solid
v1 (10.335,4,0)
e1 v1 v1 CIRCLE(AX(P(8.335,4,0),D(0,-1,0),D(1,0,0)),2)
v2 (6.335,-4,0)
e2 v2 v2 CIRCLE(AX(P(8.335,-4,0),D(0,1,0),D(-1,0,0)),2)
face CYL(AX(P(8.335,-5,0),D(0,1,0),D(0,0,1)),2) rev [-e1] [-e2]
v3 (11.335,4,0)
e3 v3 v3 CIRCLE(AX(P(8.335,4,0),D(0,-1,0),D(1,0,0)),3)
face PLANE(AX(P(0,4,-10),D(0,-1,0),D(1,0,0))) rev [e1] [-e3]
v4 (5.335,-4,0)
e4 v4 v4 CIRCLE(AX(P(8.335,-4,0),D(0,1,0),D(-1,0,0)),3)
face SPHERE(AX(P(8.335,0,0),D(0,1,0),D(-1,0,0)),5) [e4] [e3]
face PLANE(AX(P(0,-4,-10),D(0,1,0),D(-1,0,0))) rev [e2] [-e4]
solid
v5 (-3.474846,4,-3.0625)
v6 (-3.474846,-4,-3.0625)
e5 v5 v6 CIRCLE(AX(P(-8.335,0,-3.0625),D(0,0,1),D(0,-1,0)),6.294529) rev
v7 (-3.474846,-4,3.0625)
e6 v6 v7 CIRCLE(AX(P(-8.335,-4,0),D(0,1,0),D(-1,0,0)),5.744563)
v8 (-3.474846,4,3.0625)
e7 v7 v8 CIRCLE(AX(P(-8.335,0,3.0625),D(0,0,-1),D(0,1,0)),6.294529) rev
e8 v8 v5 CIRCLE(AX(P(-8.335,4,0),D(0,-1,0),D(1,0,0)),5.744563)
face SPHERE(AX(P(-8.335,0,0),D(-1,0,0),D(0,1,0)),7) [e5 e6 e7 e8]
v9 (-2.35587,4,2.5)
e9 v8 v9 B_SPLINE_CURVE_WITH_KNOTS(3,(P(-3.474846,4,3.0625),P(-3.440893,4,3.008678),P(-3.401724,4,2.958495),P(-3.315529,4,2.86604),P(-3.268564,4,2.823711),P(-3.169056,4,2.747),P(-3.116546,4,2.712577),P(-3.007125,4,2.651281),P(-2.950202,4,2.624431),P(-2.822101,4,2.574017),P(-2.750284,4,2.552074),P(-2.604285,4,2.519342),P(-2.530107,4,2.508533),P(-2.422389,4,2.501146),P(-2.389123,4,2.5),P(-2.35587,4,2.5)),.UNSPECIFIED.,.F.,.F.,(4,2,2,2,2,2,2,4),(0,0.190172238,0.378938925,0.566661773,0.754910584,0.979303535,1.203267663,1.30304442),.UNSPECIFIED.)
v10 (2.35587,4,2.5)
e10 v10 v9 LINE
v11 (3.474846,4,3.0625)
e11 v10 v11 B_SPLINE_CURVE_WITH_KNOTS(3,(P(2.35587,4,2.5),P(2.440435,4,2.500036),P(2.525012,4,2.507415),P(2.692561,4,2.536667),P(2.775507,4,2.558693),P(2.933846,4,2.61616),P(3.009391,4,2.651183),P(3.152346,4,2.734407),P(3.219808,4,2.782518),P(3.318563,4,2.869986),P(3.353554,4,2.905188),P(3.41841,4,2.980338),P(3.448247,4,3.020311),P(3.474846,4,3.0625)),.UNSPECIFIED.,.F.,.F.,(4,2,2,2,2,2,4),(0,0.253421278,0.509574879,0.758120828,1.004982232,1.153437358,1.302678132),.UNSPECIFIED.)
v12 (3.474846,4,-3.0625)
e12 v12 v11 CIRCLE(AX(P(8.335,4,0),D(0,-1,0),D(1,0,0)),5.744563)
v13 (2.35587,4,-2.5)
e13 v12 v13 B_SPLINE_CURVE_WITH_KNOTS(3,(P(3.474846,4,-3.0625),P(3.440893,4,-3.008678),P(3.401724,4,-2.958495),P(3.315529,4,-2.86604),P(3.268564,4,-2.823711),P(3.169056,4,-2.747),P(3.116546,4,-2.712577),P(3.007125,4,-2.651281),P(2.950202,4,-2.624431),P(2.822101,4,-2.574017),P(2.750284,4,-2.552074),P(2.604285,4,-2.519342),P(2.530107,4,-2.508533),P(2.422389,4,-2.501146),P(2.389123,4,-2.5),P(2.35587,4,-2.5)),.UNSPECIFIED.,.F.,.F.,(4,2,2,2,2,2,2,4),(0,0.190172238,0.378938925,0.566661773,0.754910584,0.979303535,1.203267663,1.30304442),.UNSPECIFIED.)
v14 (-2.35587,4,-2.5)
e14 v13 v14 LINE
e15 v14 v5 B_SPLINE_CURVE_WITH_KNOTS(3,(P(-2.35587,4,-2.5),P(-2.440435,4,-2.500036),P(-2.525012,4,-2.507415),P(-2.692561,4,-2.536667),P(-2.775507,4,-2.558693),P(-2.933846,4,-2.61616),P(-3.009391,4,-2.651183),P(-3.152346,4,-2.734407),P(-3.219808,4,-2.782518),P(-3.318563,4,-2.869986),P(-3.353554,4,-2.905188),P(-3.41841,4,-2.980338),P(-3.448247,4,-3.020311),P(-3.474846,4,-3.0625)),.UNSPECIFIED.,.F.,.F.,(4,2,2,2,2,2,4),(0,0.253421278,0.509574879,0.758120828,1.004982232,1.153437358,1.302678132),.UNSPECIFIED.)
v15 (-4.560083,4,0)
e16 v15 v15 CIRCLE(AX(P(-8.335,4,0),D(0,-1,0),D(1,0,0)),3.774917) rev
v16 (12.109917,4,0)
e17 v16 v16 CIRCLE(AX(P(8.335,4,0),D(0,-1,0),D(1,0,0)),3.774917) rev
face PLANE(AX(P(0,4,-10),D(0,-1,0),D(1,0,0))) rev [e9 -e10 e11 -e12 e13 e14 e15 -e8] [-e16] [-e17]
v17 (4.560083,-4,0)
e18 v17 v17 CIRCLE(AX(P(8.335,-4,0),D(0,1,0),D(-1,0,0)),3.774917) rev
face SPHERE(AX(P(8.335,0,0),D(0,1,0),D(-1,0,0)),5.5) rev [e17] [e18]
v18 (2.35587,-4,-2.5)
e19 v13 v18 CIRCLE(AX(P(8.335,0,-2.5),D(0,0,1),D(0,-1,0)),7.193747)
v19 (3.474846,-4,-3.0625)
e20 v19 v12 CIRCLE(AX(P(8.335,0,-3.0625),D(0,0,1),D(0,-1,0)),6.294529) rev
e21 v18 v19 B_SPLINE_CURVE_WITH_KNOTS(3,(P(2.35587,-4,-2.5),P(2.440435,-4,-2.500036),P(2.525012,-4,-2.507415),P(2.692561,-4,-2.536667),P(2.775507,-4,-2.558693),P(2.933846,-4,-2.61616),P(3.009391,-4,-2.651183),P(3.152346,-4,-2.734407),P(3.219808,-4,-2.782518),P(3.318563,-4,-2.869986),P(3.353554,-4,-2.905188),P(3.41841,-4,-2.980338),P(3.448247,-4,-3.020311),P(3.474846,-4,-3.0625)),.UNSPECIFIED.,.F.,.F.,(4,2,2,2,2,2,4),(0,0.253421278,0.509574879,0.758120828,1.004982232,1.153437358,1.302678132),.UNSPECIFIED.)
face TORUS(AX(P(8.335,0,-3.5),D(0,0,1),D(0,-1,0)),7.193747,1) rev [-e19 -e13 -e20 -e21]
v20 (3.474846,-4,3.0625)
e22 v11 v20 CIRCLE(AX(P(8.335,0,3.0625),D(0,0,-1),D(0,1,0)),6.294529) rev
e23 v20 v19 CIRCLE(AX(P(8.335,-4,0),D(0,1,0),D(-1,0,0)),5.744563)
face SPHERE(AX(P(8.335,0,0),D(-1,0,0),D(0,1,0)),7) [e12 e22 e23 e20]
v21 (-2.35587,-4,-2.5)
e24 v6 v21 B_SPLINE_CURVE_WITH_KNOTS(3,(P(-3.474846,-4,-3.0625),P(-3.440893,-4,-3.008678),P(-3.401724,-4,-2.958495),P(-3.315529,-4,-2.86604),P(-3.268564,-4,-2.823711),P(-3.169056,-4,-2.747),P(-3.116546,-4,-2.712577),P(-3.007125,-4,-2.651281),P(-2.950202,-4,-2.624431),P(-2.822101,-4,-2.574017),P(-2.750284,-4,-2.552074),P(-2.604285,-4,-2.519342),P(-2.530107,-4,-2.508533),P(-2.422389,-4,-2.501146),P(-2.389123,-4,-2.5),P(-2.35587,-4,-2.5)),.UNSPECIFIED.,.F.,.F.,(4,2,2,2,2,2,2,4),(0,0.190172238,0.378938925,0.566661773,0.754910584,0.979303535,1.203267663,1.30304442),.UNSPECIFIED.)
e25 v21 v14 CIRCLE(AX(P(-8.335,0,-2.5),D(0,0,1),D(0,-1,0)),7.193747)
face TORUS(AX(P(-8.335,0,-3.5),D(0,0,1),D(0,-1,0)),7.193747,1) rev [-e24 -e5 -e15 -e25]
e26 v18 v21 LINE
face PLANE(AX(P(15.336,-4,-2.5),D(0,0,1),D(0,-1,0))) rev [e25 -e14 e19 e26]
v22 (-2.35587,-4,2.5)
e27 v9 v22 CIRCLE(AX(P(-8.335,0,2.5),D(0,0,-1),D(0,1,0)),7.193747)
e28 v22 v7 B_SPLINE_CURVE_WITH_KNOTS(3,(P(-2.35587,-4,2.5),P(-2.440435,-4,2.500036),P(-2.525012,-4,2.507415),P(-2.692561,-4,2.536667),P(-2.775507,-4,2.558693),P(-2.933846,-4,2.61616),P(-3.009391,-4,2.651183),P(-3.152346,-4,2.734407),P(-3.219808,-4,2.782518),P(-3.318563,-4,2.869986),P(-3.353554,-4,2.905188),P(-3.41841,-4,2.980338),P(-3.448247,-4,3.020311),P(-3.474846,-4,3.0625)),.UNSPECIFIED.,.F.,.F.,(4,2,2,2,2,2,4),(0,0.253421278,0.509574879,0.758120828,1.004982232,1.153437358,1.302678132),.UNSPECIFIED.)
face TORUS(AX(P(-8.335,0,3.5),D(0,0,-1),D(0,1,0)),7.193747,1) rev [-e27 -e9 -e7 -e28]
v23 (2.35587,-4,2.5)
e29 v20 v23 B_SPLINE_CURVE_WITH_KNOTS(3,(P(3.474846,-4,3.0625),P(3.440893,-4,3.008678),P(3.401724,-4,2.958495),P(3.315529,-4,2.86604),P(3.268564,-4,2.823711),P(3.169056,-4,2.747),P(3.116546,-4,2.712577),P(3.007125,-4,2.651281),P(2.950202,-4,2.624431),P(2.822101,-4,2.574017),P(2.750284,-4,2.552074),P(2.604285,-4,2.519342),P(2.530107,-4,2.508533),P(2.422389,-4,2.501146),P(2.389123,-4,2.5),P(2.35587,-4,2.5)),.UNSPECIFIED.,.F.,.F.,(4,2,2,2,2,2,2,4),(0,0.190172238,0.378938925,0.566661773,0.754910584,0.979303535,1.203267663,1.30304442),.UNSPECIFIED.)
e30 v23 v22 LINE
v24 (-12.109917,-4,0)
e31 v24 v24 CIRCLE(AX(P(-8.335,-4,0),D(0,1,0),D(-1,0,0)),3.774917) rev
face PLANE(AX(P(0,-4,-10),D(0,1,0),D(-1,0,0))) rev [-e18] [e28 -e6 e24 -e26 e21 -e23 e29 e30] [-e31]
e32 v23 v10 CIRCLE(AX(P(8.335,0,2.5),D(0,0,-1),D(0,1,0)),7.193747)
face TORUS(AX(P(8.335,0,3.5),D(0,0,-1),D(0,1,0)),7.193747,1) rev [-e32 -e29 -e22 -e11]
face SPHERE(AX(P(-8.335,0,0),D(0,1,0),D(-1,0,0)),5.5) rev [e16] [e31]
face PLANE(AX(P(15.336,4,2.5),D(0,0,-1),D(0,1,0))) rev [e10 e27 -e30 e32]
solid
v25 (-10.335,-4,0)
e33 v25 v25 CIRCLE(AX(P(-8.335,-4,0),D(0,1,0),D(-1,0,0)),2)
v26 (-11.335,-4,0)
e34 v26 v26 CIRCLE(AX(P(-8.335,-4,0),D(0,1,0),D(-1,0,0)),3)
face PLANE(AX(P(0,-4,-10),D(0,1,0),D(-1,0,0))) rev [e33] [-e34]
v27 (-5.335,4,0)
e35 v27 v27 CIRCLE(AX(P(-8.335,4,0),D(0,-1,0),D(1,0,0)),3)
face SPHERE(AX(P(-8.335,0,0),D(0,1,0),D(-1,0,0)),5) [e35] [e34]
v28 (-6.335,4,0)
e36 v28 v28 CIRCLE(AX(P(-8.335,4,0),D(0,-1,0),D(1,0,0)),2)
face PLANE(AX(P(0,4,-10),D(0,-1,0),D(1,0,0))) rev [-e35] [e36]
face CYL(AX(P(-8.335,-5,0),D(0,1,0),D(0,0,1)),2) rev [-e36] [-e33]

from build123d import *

# Parameters (mm, degrees)
CORTAR_EXTRUIR1_DEPTH                    = 10
SALIENTE_EXTRUIR1_REACH                  = 19.325
SALIENTE_EXTRUIR1_END_RADIUS             = 7
CROQUIS3_W                               = 5
CROQUIS3_H                               = 8
SALIENTE_EXTRUIR1_DIRECTION_2_REACH      = 19.325
SALIENTE_EXTRUIR1_DIRECTION_2_END_RADIUS = 7
CROQUIS4_R                               = 2
CORTAR_EXTRUIR3_DEPTH                    = 5
REDONDEO1_R                              = 1


with BuildPart() as part:
    # Croquis1 → Revolución1 (revolve)
    with BuildSketch(Plane.XY):
        with BuildLine():
            Line((-13.335, 0), (-3.335, 0))
            ThreePointArc((-3.335, 0), (-8.335, 5), (-13.335, 0))
        make_face()
        with BuildLine():
            Line((-13.835, 0), (-15.335, 0))
            ThreePointArc((-15.335, 0), (-8.335, 7), (-1.335, 0))
            Line((-1.335, 0), (-2.835, 0))
            ThreePointArc((-2.835, 0), (-8.335, 5.5), (-13.835, 0))
        make_face()
        with BuildLine():
            Line((2.835, 0), (1.335, 0))
            ThreePointArc((1.335, 0), (8.335, 7), (15.335, 0))
            Line((15.335, 0), (13.835, 0))
            ThreePointArc((13.835, 0), (8.335, 5.5), (2.835, 0))
        make_face()
        with BuildLine():
            Line((13.335, 0), (3.335, 0))
            ThreePointArc((3.335, 0), (8.335, 5), (13.335, 0))
        make_face()
    revolve(axis=Axis((-8.335, 0, 0), (1, 0, 0)))

    # Croquis2 → Cortar-Extruir1 (cut, symmetric)
    with BuildSketch(Plane.XY):
        Polygon((0, 4), (-15, 4), (-15, 9), (15, 9), (15, 4), align=None)
        Polygon((15, -9), (15, -4), (0, -4), (-15, -4), (-15, -9), align=None)
    extrude(amount=CORTAR_EXTRUIR1_DEPTH, both=True, mode=Mode.SUBTRACT)

    # Saliente-Extruir1: up to this sphere (the profile starts outside it)
    saliente_extruir1_end = Location((8.335, 0, 0)) * Sphere(SALIENTE_EXTRUIR1_END_RADIUS, mode=Mode.PRIVATE)
    # Croquis3 → Saliente-Extruir1 (add, up to the surface)
    with BuildSketch(Plane(origin=(0, 0, 0), x_dir=(0, 0, -1), z_dir=(1, 0, 0)), mode=Mode.PRIVATE) as saliente_extruir1_sk1:
        Rectangle(CROQUIS3_W, CROQUIS3_H)
    saliente_extruir1_tool1 = extrude(saliente_extruir1_sk1.sketch, amount=SALIENTE_EXTRUIR1_REACH, mode=Mode.PRIVATE) - saliente_extruir1_end
    add(saliente_extruir1_tool1.solids().sort_by_distance((0, 0, 0))[0])

    # Saliente-Extruir1 direction 2: up to this sphere (the profile starts outside it)
    saliente_extruir1_direction_2_end = Location((-8.335, 0, 0)) * Sphere(SALIENTE_EXTRUIR1_DIRECTION_2_END_RADIUS, mode=Mode.PRIVATE)
    # Croquis3 → Saliente-Extruir1 direction 2 (add, up to the surface)
    with BuildSketch(Plane(origin=(0, 0, 0), x_dir=(0, 0, -1), z_dir=(1, 0, 0)), mode=Mode.PRIVATE) as saliente_extruir1_direction_2_sk1:
        Rectangle(CROQUIS3_W, CROQUIS3_H)
    saliente_extruir1_direction_2_tool1 = extrude(saliente_extruir1_direction_2_sk1.sketch, amount=-SALIENTE_EXTRUIR1_DIRECTION_2_REACH, mode=Mode.PRIVATE) - saliente_extruir1_direction_2_end
    add(saliente_extruir1_direction_2_tool1.solids().sort_by_distance((0, 0, 0))[0])

    # Croquis4 → Cortar-Extruir3 (cut, symmetric)
    with BuildSketch(Plane(origin=(0, 0, 0), x_dir=(1, 0, 0), z_dir=(0, 1, 0))):
        with Locations(Location((-8.335, 0, 0), (0, 0, 180))):
            Circle(CROQUIS4_R)
        with Locations(Location((8.335, 0, 0), (0, 0, 180))):
            Circle(CROQUIS4_R)
    extrude(amount=CORTAR_EXTRUIR3_DEPTH, both=True, mode=Mode.SUBTRACT)

    # Redondeo1
    # the kernel refuses this fillet: 1 mm, written as the material it adds along each edge
    with BuildSketch(Plane(origin=(-8.335, 0, 2.5), x_dir=(0.6145573039832218, 0.7888721823723244, 0), z_dir=(-0.7888721823723244, 0.6145573039832218, 0))) as redondeo1_piece_1_section:
        with BuildLine():
            CenterArc((7.193747285, -1), REDONDEO1_R, 90, 64.055520228)
            ThreePointArc((6.294528874, -0.5625), (6.422599664, -0.283920537), (6.538348415, 0))
            Line((6.538348415, 0), (7.193747285, 0))
        make_face()
    redondeo1_piece_1 = revolve(axis=Axis((-8.335, 0, 2.5), (0, 0, -1)), revolution_arc=104.160479503, mode=Mode.PRIVATE)
    redondeo1_piece_1 = split(redondeo1_piece_1, bisect_by=Plane(origin=(-1.676585833, -4, 2.644210853), z_dir=(0, 1, 0)), keep=Keep.TOP, mode=Mode.PRIVATE)
    redondeo1_piece_1 = split(redondeo1_piece_1, bisect_by=Plane(origin=(-1.676585833, 4, 2.644210853), z_dir=(0, -1, 0)), keep=Keep.TOP, mode=Mode.PRIVATE)
    add(redondeo1_piece_1)
    with BuildSketch(Plane(origin=(-8.335, 0, -2.5), x_dir=(0.6145573039832218, 0.7888721823723244, 0), z_dir=(-0.7888721823723244, 0.6145573039832218, 0))) as redondeo1_piece_2_section:
        with BuildLine():
            CenterArc((7.193747285, 1), REDONDEO1_R, 205.944479772, 64.055520228)
            ThreePointArc((6.294528874, 0.5625), (6.422599664, 0.283920537), (6.538348415, 0))
            Line((6.538348415, 0), (7.193747285, 0))
        make_face()
    redondeo1_piece_2 = revolve(axis=Axis((-8.335, 0, -2.5), (0, 0, -1)), revolution_arc=104.160479503, mode=Mode.PRIVATE)
    redondeo1_piece_2 = split(redondeo1_piece_2, bisect_by=Plane(origin=(-1.676585833, 4, -2.644210853), z_dir=(0, -1, 0)), keep=Keep.TOP, mode=Mode.PRIVATE)
    redondeo1_piece_2 = split(redondeo1_piece_2, bisect_by=Plane(origin=(-1.676585833, -4, -2.644210853), z_dir=(0, 1, 0)), keep=Keep.TOP, mode=Mode.PRIVATE)
    add(redondeo1_piece_2)
    with BuildSketch(Plane(origin=(8.335, 0, 2.5), x_dir=(-0.6145573039832218, 0.7888721823723245, 0), z_dir=(0.7888721823723245, 0.6145573039832218, 0))) as redondeo1_piece_3_section:
        with BuildLine():
            CenterArc((7.193747285, 1), REDONDEO1_R, 205.944479772, 64.055520228)
            ThreePointArc((6.294528874, 0.5625), (6.422599664, 0.283920537), (6.538348415, 0))
            Line((6.538348415, 0), (7.193747285, 0))
        make_face()
    redondeo1_piece_3 = revolve(axis=Axis((8.335, 0, 2.5), (0, 0, 1)), revolution_arc=104.160479503, mode=Mode.PRIVATE)
    redondeo1_piece_3 = split(redondeo1_piece_3, bisect_by=Plane(origin=(1.676585833, -4, 2.644210853), z_dir=(0, 1, 0)), keep=Keep.TOP, mode=Mode.PRIVATE)
    redondeo1_piece_3 = split(redondeo1_piece_3, bisect_by=Plane(origin=(1.676585833, 4, 2.644210853), z_dir=(0, -1, 0)), keep=Keep.TOP, mode=Mode.PRIVATE)
    add(redondeo1_piece_3)
    with BuildSketch(Plane(origin=(8.335, 0, -2.5), x_dir=(-0.6145573039832218, 0.7888721823723245, 0), z_dir=(0.7888721823723245, 0.6145573039832218, 0))) as redondeo1_piece_4_section:
        with BuildLine():
            CenterArc((7.193747285, -1), REDONDEO1_R, 90, 64.055520228)
            ThreePointArc((6.294528874, -0.5625), (6.422599664, -0.283920537), (6.538348415, 0))
            Line((6.538348415, 0), (7.193747285, 0))
        make_face()
    redondeo1_piece_4 = revolve(axis=Axis((8.335, 0, -2.5), (0, 0, 1)), revolution_arc=104.160479503, mode=Mode.PRIVATE)
    redondeo1_piece_4 = split(redondeo1_piece_4, bisect_by=Plane(origin=(1.676585833, 4, -2.644210853), z_dir=(0, -1, 0)), keep=Keep.TOP, mode=Mode.PRIVATE)
    redondeo1_piece_4 = split(redondeo1_piece_4, bisect_by=Plane(origin=(1.676585833, -4, -2.644210853), z_dir=(0, 1, 0)), keep=Keep.TOP, mode=Mode.PRIVATE)
    add(redondeo1_piece_4)


solid = part.part
